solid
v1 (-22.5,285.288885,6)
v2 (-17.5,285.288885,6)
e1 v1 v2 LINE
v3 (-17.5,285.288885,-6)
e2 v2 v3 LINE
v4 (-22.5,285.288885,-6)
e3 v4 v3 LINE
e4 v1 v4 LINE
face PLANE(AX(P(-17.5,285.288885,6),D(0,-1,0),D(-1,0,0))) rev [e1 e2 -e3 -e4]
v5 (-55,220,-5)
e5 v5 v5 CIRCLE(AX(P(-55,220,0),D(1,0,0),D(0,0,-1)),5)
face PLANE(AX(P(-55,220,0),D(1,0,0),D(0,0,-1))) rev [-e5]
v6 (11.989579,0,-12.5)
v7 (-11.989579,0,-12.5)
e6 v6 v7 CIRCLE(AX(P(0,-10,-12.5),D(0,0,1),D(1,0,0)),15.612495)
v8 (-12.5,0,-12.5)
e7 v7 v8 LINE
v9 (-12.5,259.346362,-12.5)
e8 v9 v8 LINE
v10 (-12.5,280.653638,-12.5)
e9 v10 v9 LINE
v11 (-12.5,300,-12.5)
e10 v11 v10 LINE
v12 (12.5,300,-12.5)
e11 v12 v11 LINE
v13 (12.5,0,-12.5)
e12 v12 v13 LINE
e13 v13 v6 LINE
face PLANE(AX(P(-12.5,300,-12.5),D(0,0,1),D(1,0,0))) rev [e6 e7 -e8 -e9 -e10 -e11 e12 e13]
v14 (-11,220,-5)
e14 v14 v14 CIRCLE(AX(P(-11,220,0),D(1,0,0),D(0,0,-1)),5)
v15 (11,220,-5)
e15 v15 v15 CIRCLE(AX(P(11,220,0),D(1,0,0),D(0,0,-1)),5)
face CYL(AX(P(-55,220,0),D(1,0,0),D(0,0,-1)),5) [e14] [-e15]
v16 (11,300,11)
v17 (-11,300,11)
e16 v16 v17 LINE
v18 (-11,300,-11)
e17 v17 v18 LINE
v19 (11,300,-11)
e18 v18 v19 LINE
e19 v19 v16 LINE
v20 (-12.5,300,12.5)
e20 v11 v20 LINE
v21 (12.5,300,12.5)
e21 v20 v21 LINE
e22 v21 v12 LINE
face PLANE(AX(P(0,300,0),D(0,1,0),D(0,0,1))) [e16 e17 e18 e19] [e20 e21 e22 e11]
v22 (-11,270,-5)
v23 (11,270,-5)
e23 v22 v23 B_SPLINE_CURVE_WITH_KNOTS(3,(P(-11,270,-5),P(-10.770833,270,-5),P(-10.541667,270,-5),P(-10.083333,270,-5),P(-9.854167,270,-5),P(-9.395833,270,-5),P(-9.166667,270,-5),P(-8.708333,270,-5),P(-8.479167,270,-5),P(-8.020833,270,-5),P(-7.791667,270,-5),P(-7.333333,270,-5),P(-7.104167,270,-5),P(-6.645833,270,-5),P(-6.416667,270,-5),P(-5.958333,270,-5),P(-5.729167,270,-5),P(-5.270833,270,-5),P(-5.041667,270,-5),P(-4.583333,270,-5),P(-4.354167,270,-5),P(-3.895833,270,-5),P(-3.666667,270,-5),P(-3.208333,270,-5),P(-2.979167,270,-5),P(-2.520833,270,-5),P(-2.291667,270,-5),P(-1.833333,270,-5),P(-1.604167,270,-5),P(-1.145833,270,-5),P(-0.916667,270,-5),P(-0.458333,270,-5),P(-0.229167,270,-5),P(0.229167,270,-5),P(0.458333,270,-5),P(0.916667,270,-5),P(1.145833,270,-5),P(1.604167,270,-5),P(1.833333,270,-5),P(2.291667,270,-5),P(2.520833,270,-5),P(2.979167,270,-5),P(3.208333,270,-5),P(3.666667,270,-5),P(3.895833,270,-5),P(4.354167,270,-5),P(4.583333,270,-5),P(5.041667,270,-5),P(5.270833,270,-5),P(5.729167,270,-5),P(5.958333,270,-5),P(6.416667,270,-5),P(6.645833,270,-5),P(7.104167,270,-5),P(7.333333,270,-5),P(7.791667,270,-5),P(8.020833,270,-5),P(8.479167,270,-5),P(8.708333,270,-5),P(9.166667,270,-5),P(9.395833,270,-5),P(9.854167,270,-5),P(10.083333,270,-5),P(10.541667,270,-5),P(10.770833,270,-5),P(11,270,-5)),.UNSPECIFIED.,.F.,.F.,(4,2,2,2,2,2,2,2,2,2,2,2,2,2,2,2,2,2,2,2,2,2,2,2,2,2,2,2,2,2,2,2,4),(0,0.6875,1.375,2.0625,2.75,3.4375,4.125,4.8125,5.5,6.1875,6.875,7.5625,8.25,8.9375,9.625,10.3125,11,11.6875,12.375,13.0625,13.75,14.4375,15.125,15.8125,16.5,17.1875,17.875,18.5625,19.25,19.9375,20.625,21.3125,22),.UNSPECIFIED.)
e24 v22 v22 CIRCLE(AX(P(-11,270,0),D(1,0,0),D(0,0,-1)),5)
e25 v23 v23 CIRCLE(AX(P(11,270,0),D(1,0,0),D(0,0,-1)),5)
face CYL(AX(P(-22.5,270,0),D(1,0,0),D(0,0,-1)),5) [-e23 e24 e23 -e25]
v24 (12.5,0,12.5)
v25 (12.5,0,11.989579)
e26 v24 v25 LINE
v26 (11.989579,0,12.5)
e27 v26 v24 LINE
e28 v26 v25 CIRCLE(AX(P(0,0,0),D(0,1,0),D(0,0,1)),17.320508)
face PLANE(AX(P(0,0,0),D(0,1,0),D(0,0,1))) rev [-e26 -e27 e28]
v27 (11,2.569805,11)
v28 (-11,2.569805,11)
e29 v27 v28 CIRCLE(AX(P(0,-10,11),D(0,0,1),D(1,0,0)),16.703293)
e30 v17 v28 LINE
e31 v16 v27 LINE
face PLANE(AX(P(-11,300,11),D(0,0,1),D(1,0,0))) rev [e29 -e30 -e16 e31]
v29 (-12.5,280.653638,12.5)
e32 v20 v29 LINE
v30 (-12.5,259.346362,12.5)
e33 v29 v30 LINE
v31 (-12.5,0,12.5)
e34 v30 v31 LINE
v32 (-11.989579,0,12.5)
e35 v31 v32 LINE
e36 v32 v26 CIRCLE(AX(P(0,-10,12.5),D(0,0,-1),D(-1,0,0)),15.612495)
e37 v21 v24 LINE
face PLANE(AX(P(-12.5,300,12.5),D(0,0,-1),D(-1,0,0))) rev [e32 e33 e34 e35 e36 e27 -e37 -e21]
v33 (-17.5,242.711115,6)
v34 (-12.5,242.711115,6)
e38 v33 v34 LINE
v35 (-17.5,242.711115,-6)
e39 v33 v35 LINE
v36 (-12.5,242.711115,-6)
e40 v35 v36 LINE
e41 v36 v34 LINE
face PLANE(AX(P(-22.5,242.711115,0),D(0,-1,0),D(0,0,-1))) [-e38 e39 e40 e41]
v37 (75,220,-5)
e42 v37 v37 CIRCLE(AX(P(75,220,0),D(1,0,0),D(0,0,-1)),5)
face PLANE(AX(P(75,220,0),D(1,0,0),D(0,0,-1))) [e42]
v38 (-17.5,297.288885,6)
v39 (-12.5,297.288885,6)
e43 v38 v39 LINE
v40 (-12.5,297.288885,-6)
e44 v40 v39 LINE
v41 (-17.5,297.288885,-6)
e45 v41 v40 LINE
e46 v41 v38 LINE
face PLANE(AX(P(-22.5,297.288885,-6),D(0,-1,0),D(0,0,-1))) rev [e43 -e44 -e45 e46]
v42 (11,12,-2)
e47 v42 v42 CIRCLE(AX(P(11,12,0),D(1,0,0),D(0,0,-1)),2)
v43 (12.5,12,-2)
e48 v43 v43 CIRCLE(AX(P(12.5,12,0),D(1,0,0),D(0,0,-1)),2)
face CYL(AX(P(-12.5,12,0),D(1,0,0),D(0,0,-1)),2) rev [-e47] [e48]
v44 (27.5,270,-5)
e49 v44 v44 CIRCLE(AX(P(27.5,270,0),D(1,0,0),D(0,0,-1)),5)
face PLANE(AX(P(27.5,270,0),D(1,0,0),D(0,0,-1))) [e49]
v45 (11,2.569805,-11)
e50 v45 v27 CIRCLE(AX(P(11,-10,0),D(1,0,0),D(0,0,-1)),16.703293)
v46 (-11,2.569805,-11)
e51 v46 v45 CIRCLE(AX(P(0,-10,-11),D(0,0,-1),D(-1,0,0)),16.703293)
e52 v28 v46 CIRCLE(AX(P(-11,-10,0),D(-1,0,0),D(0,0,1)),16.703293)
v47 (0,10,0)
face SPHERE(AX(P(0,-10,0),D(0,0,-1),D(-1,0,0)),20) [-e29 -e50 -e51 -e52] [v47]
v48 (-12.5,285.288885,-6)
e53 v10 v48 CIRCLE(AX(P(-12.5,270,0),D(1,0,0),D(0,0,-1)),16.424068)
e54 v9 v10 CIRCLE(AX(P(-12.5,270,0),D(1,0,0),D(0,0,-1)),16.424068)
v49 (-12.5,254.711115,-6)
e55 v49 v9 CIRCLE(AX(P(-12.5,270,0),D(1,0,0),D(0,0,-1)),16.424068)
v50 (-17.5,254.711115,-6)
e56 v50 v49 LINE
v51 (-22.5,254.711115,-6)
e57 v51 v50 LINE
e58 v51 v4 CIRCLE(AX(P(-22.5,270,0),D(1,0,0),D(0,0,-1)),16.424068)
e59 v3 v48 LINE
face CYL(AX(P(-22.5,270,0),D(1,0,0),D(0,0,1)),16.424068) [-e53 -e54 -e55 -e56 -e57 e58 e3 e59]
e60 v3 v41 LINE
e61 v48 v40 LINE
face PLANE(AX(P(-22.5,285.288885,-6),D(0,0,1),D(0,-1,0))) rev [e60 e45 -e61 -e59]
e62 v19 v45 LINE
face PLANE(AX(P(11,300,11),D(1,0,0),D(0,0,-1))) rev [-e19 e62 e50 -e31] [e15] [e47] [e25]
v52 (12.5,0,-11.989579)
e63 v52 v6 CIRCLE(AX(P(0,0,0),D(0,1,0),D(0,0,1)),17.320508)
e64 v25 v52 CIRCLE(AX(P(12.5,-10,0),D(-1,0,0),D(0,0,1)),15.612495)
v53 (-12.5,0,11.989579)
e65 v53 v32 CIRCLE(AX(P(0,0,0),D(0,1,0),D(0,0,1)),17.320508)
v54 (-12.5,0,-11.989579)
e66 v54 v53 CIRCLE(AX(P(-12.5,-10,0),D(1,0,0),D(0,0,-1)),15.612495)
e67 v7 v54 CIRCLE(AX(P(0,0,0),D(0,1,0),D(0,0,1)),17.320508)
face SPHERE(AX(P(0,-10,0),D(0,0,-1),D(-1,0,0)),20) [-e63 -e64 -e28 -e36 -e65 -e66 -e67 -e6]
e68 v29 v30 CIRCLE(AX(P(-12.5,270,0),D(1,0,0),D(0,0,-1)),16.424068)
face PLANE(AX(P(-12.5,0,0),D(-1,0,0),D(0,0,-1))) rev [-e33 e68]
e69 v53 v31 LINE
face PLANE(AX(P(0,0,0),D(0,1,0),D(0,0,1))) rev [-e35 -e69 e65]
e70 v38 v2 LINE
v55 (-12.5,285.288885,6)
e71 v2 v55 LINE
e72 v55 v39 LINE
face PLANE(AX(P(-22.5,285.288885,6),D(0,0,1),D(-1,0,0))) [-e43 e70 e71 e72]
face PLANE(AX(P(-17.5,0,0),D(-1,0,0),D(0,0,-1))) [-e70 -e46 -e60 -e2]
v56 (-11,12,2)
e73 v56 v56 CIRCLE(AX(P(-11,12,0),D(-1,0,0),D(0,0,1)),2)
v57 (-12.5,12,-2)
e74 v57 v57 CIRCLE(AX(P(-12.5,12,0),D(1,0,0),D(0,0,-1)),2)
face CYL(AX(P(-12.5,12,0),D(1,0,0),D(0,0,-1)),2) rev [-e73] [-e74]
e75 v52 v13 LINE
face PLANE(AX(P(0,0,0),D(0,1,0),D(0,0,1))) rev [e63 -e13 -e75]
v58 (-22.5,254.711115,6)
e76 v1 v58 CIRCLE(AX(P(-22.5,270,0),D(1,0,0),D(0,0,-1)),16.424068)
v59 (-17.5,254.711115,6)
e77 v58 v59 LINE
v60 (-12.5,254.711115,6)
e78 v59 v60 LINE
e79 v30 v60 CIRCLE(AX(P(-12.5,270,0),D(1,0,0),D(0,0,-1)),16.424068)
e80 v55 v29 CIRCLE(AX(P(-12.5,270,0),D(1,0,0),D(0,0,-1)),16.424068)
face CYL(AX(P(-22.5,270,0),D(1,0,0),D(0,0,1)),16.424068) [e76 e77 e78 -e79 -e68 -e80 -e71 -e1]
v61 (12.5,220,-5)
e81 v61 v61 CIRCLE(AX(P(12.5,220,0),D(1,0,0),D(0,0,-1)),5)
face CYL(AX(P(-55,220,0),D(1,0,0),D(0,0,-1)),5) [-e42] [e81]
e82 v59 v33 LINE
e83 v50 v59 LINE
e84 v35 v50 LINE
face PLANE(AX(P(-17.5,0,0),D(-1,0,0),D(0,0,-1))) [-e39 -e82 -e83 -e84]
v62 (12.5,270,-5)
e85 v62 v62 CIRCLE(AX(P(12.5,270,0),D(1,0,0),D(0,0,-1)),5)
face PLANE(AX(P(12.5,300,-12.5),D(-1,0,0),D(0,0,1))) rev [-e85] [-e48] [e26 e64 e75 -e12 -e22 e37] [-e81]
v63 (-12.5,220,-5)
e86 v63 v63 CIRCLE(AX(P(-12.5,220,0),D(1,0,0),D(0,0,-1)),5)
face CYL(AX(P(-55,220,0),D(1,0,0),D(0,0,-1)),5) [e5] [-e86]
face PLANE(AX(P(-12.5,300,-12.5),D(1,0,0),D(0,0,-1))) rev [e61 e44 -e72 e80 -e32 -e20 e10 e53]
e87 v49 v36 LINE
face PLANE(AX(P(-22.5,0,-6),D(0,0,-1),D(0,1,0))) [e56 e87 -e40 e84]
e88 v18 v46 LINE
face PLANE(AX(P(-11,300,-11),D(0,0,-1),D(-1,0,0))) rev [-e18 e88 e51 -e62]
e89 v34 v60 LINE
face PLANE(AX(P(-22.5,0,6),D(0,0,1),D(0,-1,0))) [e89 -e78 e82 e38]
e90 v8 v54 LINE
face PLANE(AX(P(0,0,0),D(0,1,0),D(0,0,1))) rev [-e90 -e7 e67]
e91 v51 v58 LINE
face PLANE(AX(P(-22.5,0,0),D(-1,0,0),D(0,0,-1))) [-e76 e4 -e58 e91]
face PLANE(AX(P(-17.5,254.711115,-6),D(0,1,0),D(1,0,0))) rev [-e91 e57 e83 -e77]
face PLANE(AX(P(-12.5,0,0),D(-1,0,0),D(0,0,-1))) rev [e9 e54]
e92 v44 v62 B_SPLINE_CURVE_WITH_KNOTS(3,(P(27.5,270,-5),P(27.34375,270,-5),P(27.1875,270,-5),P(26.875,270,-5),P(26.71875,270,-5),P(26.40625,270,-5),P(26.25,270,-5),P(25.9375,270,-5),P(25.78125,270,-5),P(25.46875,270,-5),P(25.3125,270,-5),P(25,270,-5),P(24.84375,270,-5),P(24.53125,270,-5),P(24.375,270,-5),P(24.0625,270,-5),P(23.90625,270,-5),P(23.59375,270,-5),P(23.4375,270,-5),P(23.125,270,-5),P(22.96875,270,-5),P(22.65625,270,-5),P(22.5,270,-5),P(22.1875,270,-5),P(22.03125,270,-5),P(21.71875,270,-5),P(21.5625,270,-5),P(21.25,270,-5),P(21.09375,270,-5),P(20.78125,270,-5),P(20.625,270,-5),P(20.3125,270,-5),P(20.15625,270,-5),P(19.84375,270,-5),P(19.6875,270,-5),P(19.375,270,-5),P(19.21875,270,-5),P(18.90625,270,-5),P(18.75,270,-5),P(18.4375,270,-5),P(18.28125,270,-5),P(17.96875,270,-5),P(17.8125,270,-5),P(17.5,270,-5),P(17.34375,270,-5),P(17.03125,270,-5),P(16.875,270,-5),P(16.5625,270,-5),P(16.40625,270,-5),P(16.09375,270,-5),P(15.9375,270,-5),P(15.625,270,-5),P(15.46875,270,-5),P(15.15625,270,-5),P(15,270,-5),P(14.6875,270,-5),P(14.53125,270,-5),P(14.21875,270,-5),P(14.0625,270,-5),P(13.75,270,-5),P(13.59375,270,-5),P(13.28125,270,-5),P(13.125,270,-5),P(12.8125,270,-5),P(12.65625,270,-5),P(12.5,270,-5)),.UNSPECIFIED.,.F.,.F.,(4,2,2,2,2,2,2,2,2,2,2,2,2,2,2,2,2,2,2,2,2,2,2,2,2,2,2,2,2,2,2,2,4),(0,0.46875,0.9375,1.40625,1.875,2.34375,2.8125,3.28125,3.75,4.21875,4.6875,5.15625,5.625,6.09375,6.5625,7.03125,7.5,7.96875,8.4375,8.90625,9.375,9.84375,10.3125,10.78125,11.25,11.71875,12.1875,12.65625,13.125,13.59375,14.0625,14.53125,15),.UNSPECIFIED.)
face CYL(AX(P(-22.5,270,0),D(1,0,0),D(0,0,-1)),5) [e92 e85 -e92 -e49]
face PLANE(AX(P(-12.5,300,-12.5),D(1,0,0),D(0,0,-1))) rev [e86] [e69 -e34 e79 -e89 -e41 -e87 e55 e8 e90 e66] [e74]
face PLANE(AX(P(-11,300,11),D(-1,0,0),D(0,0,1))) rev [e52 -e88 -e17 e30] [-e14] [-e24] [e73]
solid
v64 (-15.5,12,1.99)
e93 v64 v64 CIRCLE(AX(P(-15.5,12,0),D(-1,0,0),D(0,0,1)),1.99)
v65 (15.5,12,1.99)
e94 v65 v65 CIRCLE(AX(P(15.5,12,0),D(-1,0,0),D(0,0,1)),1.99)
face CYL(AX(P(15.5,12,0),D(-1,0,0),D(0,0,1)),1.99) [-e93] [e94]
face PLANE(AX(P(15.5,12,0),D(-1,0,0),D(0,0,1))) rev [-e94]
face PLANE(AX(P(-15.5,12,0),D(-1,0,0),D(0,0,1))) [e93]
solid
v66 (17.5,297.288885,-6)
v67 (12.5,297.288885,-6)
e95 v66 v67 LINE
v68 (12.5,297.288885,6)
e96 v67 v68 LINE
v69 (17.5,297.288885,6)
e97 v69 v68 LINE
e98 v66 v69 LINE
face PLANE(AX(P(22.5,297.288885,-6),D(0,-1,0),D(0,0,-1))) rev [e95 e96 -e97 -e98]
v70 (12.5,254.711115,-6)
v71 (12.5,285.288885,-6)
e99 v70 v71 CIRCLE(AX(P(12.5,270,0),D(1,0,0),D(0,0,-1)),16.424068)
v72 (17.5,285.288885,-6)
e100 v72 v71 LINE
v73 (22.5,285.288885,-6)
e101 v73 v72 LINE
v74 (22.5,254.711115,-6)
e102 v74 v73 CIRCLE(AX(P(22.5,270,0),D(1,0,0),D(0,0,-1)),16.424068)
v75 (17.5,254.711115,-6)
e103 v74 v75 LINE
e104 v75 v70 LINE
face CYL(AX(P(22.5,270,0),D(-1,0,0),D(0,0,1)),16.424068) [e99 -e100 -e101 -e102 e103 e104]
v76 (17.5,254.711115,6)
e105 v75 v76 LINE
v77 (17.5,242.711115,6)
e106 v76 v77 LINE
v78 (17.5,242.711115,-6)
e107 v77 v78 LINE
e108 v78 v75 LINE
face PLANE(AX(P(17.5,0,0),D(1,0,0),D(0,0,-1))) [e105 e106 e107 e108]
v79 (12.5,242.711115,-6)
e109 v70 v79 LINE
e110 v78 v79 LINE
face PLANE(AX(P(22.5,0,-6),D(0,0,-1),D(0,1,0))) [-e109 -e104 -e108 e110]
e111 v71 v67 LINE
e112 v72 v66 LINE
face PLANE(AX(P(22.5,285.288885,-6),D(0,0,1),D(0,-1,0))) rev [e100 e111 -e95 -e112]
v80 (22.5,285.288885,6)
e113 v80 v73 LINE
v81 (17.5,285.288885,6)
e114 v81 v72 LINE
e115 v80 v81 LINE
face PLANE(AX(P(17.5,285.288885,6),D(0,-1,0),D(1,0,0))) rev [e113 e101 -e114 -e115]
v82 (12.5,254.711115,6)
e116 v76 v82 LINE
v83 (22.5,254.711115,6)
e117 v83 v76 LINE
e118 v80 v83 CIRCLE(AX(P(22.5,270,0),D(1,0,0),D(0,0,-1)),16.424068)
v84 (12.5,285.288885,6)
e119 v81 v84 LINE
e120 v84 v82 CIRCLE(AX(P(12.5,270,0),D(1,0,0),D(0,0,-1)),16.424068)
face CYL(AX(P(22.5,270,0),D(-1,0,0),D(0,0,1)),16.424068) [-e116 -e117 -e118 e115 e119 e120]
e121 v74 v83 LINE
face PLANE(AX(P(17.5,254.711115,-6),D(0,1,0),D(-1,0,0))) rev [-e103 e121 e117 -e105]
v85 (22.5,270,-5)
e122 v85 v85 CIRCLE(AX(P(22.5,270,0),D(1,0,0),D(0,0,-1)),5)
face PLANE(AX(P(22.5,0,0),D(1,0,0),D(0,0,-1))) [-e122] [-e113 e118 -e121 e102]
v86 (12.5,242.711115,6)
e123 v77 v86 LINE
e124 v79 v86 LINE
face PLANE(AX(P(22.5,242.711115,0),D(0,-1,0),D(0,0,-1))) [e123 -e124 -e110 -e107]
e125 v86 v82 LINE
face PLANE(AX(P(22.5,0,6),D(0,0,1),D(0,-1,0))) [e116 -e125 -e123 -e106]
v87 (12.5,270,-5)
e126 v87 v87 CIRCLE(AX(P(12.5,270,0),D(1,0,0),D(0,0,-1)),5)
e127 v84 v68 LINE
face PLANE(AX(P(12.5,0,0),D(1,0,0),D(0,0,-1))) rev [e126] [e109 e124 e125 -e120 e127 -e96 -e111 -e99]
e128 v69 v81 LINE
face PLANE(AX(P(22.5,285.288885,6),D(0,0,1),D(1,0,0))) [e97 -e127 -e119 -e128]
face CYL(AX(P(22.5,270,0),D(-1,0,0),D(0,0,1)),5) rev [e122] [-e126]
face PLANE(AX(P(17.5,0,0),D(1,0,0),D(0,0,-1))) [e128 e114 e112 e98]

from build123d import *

# Parameters (mm, degrees)
SKETCH1_W                 = 25
SKETCH1_H                 = 25
BOSS_EXTRUDE1_DEPTH       = 300
SKETCH3_W                 = 22
SKETCH3_H                 = 22
CUT_EXTRUDE1_DEPTH        = 300
SKETCH6_R                 = 2
CUT_EXTRUDE3_DEPTH        = 25
SKETCH9_R                 = 1.99
BOSS_EXTRUDE8_DEPTH       = 28
SKETCH10_R                = 1.99
BOSS_EXTRUDE9_DEPTH       = 3
SKETCH11_R                = 5
BOSS_EXTRUDE10_DEPTH      = 10
SKETCH12_R                = 5
CUT_EXTRUDE4_DEPTH        = 1.5
SKETCH15_W                = 12
SKETCH15_H                = 12
CUT_EXTRUDE5_DEPTH        = 5
BOSS_EXTRUDE11_DEPTH      = 75
BOSS_EXTRUDE11_DEPTH_BACK = 55
SKETCH13_R                = 5
BOSS_EXTRUDE12_DEPTH      = 27.5
BOSS_EXTRUDE12_DEPTH_BACK = 22.5
SKETCH14_R                = 5


with BuildPart() as part:
    # Sketch1 → Boss-Extrude1 (new body)
    with BuildSketch(Plane(origin=(0, 0, 0), x_dir=(1, 0, 0), z_dir=(0, 1, 0))):
        Rectangle(SKETCH1_W, SKETCH1_H)
    extrude(amount=BOSS_EXTRUDE1_DEPTH)

    # Sketch3 → Cut-Extrude1 (cut)
    with BuildSketch(Plane.XZ):
        Rectangle(SKETCH3_W, SKETCH3_H)
    extrude(amount=-CUT_EXTRUDE1_DEPTH, mode=Mode.SUBTRACT)

    # Sketch4 → Revolve1 (revolve)
    with BuildSketch(Plane(origin=(0, -10, 0), x_dir=(-1, 0, 0), z_dir=(0, -1, 0))):
        with BuildLine():
            Line((0, 20), (0, -20))
            ThreePointArc((0, -20), (-20, 0), (0, 20))
        make_face()
    revolve(axis=Axis((0, -10, -13.212098256), (0, 0, 1)))

    # Sketch6 → Cut-Extrude3 (cut)
    with BuildSketch(Plane(origin=(12.5, 0, 0), x_dir=(0, 0, -1), z_dir=(1, 0, 0))):
        with Locations((0, 12)):
            Circle(SKETCH6_R)
    extrude(amount=-CUT_EXTRUDE3_DEPTH, mode=Mode.SUBTRACT)

    # Sketch12 → Cut-Extrude4 (cut)
    with BuildSketch(Plane(origin=(12.5, 0, 0), x_dir=(0, 0, -1), z_dir=(1, 0, 0))):
        with Locations((0, 270)):
            Circle(SKETCH12_R)
        with Locations((0, 220)):
            Circle(SKETCH12_R)
    cut_extrude4 = extrude(amount=-CUT_EXTRUDE4_DEPTH, mode=Mode.SUBTRACT)


with BuildPart() as body_2:
    # Sketch9 → Boss-Extrude8 (new body)
    with BuildSketch(Plane.ZY.offset(12.5)):
        with Locations((0, 12)):
            Circle(SKETCH9_R)
    extrude(amount=-BOSS_EXTRUDE8_DEPTH)

    # Sketch10 → Boss-Extrude9 (add)
    with BuildSketch(Plane.ZY.offset(12.5)):
        with Locations((0, 12)):
            Circle(SKETCH10_R)
    extrude(amount=BOSS_EXTRUDE9_DEPTH)


with BuildPart() as body_3:
    # Sketch11 → Boss-Extrude10 (new body)
    with BuildSketch(Plane(origin=(12.5, 0, 0), x_dir=(0, 0, -1), z_dir=(1, 0, 0))):
        with BuildLine():
            Line((6, 297.288884851), (-6, 297.288884851))
            Line((-6, 297.288884851), (-6, 285.288884851))
            ThreePointArc((-6, 285.288884851), (-16.424067706, 270), (-6, 254.711115149))
            Line((-6, 254.711115149), (-6, 242.711115149))
            Line((-6, 242.711115149), (6, 242.711115149))
            Line((6, 242.711115149), (6, 254.711115149))
            ThreePointArc((6, 254.711115149), (16.424067706, 270), (6, 285.288884851))
            Line((6, 285.288884851), (6, 297.288884851))
        make_face()
        with Locations((0, 270)):
            Circle(SKETCH11_R, mode=Mode.SUBTRACT)
    boss_extrude10 = extrude(amount=BOSS_EXTRUDE10_DEPTH)

    # Sketch15 → Cut-Extrude5 (cut)
    with BuildSketch(Plane(origin=(22.5, 0, 0), x_dir=(0, 0, -1), z_dir=(1, 0, 0))):
        with Locations((0, 248.711115149)):
            Rectangle(SKETCH15_W, SKETCH15_H)
        with Locations((0, 291.288884851)):
            Rectangle(SKETCH15_W, SKETCH15_H)
    cut_extrude5 = extrude(amount=-CUT_EXTRUDE5_DEPTH, mode=Mode.SUBTRACT)


with BuildPart() as part_1:
    add(part.part)

    # Mirror1: Boss-Extrude10, Cut-Extrude4, Cut-Extrude5 across plane
    add(boss_extrude10.mirror(Plane(origin=(0, 0, 0), x_dir=(0, 0, 1), z_dir=(1, 0, 0))))
    add(cut_extrude4.mirror(Plane(origin=(0, 0, 0), x_dir=(0, 0, 1), z_dir=(1, 0, 0))), mode=Mode.SUBTRACT)
    add(cut_extrude5.mirror(Plane(origin=(0, 0, 0), x_dir=(0, 0, 1), z_dir=(1, 0, 0))), mode=Mode.SUBTRACT)

    # Sketch13 → Boss-Extrude11 (add, two sides: drawn at the far end of the back side and taken through both)
    with BuildSketch(Plane(origin=(0, 0, 0), x_dir=(0, 0, -1), z_dir=(1, 0, 0)).offset(-BOSS_EXTRUDE11_DEPTH_BACK)):
        with Locations((0, 220)):
            Circle(SKETCH13_R)
    extrude(amount=BOSS_EXTRUDE11_DEPTH + BOSS_EXTRUDE11_DEPTH_BACK)

    # Sketch14 → Boss-Extrude12 (add, two sides: drawn at the far end of the back side and taken through both)
    with BuildSketch(Plane(origin=(0, 0, 0), x_dir=(0, 0, -1), z_dir=(1, 0, 0)).offset(-BOSS_EXTRUDE12_DEPTH_BACK)):
        with Locations((0, 270)):
            Circle(SKETCH14_R)
    extrude(amount=BOSS_EXTRUDE12_DEPTH + BOSS_EXTRUDE12_DEPTH_BACK)


solid = Compound([body_2.part, body_3.part, part_1.part])
